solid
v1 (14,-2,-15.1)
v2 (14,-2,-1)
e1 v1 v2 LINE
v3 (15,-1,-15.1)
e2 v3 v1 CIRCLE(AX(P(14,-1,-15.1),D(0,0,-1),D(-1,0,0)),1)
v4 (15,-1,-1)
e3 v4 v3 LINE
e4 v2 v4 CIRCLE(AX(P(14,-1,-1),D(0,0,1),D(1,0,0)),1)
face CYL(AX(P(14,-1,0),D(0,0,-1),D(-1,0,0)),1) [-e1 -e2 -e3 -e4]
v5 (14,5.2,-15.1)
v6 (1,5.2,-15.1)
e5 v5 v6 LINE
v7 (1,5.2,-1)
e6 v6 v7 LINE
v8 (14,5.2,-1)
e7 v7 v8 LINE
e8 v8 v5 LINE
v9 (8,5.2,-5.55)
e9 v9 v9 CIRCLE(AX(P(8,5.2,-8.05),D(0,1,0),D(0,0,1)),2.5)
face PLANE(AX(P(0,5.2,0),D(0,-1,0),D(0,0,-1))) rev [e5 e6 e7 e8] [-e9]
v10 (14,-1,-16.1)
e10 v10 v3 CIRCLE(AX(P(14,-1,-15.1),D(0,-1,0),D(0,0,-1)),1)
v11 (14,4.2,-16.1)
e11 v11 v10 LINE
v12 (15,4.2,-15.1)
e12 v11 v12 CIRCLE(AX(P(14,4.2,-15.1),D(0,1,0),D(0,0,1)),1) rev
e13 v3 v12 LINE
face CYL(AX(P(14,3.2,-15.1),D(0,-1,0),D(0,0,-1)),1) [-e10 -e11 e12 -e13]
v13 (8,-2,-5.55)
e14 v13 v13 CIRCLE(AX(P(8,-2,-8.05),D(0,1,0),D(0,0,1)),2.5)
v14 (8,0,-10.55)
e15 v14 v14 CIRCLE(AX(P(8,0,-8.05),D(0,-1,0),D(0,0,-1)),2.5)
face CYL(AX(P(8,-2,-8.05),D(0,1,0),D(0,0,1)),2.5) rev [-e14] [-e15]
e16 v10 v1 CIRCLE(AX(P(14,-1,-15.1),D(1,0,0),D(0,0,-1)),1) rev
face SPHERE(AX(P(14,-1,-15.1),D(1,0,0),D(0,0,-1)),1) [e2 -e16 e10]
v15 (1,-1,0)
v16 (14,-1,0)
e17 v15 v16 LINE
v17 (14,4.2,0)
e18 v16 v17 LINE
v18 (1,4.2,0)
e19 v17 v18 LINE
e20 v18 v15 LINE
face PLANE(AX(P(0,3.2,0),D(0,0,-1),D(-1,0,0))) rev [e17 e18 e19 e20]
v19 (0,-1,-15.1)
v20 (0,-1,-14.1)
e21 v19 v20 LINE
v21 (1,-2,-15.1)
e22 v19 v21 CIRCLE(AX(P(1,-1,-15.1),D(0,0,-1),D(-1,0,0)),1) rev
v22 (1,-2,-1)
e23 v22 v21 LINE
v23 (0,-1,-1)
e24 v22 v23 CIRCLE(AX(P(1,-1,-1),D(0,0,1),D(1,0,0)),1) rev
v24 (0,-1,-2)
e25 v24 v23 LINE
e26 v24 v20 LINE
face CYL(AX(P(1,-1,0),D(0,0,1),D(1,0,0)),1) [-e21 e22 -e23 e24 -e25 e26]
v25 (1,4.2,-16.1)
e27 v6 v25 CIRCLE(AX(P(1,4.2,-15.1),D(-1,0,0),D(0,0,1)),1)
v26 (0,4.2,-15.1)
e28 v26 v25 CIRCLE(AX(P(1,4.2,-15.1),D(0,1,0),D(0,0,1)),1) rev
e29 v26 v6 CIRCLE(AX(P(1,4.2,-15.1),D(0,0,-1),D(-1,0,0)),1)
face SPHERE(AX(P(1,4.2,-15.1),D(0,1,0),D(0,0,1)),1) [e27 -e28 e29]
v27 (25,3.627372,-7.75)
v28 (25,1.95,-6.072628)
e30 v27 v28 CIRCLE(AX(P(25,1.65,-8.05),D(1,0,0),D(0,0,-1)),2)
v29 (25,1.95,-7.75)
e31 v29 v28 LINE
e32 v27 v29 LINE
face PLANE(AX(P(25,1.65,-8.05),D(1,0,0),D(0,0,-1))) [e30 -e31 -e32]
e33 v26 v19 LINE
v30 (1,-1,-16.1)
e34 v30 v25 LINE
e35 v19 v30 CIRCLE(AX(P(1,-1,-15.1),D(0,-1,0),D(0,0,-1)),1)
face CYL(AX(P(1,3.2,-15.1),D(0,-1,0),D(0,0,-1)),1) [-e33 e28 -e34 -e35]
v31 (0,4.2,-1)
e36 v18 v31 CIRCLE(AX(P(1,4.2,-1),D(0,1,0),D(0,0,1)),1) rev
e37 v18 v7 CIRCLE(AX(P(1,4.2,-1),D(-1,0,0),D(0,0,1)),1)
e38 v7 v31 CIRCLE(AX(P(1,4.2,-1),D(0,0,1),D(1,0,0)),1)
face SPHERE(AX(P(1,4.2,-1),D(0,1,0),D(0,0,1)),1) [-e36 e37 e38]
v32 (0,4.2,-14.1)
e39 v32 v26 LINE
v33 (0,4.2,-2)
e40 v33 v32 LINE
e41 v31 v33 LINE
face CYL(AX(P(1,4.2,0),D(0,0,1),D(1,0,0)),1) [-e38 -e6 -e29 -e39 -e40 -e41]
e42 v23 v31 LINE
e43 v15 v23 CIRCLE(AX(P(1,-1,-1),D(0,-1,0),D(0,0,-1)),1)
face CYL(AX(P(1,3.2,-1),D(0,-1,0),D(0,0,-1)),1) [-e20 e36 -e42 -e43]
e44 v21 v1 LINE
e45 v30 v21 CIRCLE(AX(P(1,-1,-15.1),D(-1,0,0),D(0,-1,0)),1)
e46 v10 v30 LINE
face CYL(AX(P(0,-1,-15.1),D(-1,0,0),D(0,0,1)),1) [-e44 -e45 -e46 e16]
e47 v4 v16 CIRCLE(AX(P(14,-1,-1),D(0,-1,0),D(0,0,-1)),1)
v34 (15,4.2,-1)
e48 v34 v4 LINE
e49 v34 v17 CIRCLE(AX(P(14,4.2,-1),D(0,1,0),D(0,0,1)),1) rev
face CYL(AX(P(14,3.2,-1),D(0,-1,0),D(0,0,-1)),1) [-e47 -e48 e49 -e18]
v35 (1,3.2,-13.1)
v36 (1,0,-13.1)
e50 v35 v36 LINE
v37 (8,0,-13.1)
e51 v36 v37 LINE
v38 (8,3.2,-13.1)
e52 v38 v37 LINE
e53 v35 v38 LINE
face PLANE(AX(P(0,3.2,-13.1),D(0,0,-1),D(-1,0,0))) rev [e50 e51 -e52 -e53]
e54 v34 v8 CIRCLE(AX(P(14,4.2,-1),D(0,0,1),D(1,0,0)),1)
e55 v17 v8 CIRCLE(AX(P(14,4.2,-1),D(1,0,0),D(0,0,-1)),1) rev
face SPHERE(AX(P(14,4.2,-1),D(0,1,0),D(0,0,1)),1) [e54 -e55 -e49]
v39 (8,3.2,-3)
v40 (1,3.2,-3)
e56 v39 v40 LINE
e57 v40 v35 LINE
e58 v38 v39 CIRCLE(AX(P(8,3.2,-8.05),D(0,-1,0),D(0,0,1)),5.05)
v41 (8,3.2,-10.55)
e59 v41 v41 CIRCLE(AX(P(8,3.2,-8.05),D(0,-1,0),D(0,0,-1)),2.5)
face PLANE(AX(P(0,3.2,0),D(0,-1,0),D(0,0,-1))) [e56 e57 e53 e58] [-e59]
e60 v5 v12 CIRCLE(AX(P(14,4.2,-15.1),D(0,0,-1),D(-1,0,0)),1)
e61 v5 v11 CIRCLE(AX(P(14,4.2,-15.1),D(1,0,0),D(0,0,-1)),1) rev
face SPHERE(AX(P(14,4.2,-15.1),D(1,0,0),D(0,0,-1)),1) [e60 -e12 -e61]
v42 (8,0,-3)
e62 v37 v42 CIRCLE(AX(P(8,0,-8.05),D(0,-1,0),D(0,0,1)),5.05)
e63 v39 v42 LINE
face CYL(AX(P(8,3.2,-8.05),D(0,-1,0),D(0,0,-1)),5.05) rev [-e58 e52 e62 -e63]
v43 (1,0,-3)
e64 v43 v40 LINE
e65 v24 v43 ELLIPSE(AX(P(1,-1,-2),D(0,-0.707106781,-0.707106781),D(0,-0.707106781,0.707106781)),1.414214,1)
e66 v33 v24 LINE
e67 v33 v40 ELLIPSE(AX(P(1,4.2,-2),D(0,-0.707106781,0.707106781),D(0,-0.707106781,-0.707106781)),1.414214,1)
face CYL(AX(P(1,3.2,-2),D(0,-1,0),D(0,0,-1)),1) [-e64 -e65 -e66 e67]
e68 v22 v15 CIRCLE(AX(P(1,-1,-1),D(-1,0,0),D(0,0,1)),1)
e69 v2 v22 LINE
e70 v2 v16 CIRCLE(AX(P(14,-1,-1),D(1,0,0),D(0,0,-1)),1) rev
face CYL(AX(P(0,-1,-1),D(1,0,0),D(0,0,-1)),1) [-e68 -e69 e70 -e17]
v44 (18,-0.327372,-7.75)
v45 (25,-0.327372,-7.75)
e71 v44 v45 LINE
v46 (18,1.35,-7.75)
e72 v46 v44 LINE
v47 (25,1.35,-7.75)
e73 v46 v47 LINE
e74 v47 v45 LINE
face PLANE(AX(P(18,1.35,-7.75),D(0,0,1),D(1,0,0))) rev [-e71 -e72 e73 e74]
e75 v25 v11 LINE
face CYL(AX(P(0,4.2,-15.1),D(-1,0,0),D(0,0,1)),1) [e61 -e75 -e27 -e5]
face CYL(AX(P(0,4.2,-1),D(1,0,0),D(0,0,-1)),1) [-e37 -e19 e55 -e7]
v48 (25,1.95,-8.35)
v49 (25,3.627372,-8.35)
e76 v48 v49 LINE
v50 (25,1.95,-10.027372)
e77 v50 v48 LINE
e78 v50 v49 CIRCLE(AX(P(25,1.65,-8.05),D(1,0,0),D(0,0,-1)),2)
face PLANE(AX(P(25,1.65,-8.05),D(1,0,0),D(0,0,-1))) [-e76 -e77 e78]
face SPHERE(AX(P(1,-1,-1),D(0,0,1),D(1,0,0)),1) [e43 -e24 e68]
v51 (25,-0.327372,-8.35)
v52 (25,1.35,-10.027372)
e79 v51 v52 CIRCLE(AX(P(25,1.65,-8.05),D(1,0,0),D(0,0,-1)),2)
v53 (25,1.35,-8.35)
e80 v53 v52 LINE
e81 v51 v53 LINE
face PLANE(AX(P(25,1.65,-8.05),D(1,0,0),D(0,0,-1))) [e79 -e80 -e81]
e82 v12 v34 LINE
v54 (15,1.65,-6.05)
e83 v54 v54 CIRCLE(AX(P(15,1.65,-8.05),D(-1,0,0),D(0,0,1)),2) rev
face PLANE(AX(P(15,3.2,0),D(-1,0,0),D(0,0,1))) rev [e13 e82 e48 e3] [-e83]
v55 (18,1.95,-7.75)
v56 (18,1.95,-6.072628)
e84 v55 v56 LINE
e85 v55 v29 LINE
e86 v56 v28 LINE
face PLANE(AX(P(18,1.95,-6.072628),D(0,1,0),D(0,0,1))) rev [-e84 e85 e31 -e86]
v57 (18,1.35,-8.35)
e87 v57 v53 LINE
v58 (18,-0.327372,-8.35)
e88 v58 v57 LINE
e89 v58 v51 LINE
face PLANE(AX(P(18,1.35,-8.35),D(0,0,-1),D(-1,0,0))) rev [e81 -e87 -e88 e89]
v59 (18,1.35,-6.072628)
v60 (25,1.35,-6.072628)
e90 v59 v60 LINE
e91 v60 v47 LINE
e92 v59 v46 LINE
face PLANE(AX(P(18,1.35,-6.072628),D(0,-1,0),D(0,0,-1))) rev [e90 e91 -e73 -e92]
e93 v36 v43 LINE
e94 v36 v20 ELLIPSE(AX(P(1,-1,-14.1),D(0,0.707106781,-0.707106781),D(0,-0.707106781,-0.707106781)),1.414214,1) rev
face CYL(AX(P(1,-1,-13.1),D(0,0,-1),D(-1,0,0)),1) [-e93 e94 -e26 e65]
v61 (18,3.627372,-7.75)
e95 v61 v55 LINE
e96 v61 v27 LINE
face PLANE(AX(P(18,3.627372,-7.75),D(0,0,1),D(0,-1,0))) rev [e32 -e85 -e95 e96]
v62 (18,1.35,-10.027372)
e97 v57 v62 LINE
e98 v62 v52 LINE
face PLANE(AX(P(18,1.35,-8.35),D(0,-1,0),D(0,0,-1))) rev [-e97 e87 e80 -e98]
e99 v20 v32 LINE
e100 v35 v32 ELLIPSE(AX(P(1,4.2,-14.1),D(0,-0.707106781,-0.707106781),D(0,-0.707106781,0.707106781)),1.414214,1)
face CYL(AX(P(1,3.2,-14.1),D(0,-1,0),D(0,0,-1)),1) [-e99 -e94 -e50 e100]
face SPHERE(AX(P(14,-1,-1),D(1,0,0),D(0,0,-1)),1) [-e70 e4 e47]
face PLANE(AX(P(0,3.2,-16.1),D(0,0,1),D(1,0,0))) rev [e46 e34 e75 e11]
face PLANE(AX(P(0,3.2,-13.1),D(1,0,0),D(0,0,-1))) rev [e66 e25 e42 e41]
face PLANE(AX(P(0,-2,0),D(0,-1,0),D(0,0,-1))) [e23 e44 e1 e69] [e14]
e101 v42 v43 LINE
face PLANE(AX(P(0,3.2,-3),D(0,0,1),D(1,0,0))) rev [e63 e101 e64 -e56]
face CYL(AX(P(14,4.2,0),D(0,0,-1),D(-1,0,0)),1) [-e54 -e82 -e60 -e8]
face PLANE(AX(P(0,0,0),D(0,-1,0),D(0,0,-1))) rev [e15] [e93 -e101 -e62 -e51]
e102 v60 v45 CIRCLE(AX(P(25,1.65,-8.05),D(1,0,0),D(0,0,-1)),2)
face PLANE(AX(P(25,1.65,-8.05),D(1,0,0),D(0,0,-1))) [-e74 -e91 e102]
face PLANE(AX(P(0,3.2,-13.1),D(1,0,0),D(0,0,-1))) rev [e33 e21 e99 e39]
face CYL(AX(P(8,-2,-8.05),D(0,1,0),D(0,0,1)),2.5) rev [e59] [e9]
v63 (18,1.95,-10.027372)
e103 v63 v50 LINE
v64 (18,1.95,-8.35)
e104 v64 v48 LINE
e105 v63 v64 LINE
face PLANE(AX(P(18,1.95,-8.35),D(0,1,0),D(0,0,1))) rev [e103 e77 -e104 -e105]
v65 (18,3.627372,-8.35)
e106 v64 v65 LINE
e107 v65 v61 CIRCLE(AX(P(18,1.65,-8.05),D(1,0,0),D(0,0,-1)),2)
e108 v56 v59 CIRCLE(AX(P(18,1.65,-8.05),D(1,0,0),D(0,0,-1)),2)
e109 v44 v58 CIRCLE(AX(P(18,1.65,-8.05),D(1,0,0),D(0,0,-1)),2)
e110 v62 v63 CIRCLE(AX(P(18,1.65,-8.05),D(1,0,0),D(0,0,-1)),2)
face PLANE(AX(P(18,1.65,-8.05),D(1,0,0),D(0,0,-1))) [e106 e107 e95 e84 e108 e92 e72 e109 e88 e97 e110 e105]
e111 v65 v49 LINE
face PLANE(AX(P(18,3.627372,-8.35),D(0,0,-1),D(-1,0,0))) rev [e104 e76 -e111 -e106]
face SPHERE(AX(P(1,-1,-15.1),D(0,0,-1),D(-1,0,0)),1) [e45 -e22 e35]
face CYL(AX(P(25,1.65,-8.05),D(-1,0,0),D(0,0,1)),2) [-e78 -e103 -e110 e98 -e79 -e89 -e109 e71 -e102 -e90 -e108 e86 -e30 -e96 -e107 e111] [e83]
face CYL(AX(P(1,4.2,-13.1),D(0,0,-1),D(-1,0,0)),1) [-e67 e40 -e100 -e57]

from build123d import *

# Parameters (mm, degrees)
BOSS_EXTRUDE1_DEPTH = 3.2
SKETCH2_W           = 15
SKETCH2_H           = 16.1
BOSS_EXTRUDE2_DEPTH = 2
SKETCH3_W           = 15
SKETCH3_H           = 16.1
BOSS_EXTRUDE3_DEPTH = 2
FILLET1_R           = 1
SKETCH4_R           = 2
BOSS_EXTRUDE4_DEPTH = 10
CUT_EXTRUDE1_START  = -7
CUT_EXTRUDE1_DEPTH  = 7
SKETCH6_R           = 2.5
CUT_EXTRUDE2_DEPTH  = 31.594934221


with BuildPart() as part:
    # Sketch1 → Boss-Extrude1 (new body)
    with BuildSketch(Plane(origin=(0, 0, 0), x_dir=(1, 0, 0), z_dir=(0, 1, 0))):
        with BuildLine():
            Line((0, 13.1), (0, 16.1))
            Line((0, 16.1), (15, 16.1))
            Line((15, 16.1), (15, 0))
            Line((15, 0), (0, 0))
            Line((0, 0), (0, 3))
            Line((0, 3), (8, 3))
            ThreePointArc((8, 3), (13.05, 8.05), (8, 13.1))
            Line((8, 13.1), (0, 13.1))
        make_face()
    extrude(amount=BOSS_EXTRUDE1_DEPTH)

    # Sketch2 → Boss-Extrude2 (add)
    with BuildSketch(Plane(origin=(0, 3.2, 0), x_dir=(1, 0, 0), z_dir=(0, 1, 0))):
        with Locations((7.5, 8.05)):
            Rectangle(SKETCH2_W, SKETCH2_H)
    extrude(amount=BOSS_EXTRUDE2_DEPTH)

    # Sketch3 → Boss-Extrude3 (add)
    with BuildSketch(Plane.XZ):
        with Locations((7.5, -8.05)):
            Rectangle(SKETCH3_W, SKETCH3_H)
    extrude(amount=BOSS_EXTRUDE3_DEPTH)

    # Fillet1
    fillet1_edges = [part.edges().sort_by_distance(p)[0] for p in [
        (0, 1.6, -3),
        (0, 1.6, -13.1),
        (0, 1.6, -16.1),
        (15, 1.6, -16.1),
        (15, 1.6, 0),
        (0, 1.6, 0),
        (0, 3.2, -8.05),
        (15, 5.2, -8.05),
        (7.5, 5.2, -16.1),
        (0, 5.2, -8.05),
        (7.5, 5.2, 0),
        (0, 0, -8.05),
        (0, -2, -8.05),
        (7.5, -2, -16.1),
        (15, -2, -8.05),
        (7.5, -2, 0),
    ]]
    fillet(fillet1_edges, radius=FILLET1_R - 0.0001)  # a hair under: the kernel refuses the full size

    # Sketch4 → Boss-Extrude4 (add)
    with BuildSketch(Plane(origin=(15, 0, 0), x_dir=(0, 0, -1), z_dir=(1, 0, 0))):
        with Locations(Location((8.05, 1.65, 0), (0, 0, 180))):
            Circle(SKETCH4_R)
    extrude(amount=BOSS_EXTRUDE4_DEPTH)

    # Sketch5 → Cut-Extrude1 (cut)
    with BuildSketch(Plane(origin=(25, 0, 0), x_dir=(0, 0, -1), z_dir=(1, 0, 0)).offset(CUT_EXTRUDE1_START)):
        with BuildLine():
            Line((6.072628007, 1.95), (7.75, 1.95))
            Line((7.75, 1.95), (7.75, 3.627371993))
            ThreePointArc((7.75, 3.627371993), (8.05, 3.65), (8.35, 3.627371993))
            Line((8.35, 3.627371993), (8.35, 1.95))
            Line((8.35, 1.95), (10.027371993, 1.95))
            ThreePointArc((10.027371993, 1.95), (10.05, 1.65), (10.027371993, 1.35))
            Line((10.027371993, 1.35), (8.35, 1.35))
            Line((8.35, 1.35), (8.35, -0.327371993))
            ThreePointArc((8.35, -0.327371993), (8.05, -0.35), (7.75, -0.327371993))
            Line((7.75, -0.327371993), (7.75, 1.35))
            Line((7.75, 1.35), (6.072628007, 1.35))
            ThreePointArc((6.072628007, 1.35), (6.05, 1.65), (6.072628007, 1.95))
        make_face()
    extrude(amount=CUT_EXTRUDE1_DEPTH, mode=Mode.SUBTRACT)

    # Sketch6 → Cut-Extrude2 (cut, through all)
    with BuildSketch(Plane(origin=(0, 5.2, 0), x_dir=(1, 0, 0), z_dir=(0, 1, 0))):
        with Locations(Location((8, 8.05, 0), (0, 0, 270))):
            Circle(SKETCH6_R)
    extrude(amount=-CUT_EXTRUDE2_DEPTH, mode=Mode.SUBTRACT)


solid = part.part
